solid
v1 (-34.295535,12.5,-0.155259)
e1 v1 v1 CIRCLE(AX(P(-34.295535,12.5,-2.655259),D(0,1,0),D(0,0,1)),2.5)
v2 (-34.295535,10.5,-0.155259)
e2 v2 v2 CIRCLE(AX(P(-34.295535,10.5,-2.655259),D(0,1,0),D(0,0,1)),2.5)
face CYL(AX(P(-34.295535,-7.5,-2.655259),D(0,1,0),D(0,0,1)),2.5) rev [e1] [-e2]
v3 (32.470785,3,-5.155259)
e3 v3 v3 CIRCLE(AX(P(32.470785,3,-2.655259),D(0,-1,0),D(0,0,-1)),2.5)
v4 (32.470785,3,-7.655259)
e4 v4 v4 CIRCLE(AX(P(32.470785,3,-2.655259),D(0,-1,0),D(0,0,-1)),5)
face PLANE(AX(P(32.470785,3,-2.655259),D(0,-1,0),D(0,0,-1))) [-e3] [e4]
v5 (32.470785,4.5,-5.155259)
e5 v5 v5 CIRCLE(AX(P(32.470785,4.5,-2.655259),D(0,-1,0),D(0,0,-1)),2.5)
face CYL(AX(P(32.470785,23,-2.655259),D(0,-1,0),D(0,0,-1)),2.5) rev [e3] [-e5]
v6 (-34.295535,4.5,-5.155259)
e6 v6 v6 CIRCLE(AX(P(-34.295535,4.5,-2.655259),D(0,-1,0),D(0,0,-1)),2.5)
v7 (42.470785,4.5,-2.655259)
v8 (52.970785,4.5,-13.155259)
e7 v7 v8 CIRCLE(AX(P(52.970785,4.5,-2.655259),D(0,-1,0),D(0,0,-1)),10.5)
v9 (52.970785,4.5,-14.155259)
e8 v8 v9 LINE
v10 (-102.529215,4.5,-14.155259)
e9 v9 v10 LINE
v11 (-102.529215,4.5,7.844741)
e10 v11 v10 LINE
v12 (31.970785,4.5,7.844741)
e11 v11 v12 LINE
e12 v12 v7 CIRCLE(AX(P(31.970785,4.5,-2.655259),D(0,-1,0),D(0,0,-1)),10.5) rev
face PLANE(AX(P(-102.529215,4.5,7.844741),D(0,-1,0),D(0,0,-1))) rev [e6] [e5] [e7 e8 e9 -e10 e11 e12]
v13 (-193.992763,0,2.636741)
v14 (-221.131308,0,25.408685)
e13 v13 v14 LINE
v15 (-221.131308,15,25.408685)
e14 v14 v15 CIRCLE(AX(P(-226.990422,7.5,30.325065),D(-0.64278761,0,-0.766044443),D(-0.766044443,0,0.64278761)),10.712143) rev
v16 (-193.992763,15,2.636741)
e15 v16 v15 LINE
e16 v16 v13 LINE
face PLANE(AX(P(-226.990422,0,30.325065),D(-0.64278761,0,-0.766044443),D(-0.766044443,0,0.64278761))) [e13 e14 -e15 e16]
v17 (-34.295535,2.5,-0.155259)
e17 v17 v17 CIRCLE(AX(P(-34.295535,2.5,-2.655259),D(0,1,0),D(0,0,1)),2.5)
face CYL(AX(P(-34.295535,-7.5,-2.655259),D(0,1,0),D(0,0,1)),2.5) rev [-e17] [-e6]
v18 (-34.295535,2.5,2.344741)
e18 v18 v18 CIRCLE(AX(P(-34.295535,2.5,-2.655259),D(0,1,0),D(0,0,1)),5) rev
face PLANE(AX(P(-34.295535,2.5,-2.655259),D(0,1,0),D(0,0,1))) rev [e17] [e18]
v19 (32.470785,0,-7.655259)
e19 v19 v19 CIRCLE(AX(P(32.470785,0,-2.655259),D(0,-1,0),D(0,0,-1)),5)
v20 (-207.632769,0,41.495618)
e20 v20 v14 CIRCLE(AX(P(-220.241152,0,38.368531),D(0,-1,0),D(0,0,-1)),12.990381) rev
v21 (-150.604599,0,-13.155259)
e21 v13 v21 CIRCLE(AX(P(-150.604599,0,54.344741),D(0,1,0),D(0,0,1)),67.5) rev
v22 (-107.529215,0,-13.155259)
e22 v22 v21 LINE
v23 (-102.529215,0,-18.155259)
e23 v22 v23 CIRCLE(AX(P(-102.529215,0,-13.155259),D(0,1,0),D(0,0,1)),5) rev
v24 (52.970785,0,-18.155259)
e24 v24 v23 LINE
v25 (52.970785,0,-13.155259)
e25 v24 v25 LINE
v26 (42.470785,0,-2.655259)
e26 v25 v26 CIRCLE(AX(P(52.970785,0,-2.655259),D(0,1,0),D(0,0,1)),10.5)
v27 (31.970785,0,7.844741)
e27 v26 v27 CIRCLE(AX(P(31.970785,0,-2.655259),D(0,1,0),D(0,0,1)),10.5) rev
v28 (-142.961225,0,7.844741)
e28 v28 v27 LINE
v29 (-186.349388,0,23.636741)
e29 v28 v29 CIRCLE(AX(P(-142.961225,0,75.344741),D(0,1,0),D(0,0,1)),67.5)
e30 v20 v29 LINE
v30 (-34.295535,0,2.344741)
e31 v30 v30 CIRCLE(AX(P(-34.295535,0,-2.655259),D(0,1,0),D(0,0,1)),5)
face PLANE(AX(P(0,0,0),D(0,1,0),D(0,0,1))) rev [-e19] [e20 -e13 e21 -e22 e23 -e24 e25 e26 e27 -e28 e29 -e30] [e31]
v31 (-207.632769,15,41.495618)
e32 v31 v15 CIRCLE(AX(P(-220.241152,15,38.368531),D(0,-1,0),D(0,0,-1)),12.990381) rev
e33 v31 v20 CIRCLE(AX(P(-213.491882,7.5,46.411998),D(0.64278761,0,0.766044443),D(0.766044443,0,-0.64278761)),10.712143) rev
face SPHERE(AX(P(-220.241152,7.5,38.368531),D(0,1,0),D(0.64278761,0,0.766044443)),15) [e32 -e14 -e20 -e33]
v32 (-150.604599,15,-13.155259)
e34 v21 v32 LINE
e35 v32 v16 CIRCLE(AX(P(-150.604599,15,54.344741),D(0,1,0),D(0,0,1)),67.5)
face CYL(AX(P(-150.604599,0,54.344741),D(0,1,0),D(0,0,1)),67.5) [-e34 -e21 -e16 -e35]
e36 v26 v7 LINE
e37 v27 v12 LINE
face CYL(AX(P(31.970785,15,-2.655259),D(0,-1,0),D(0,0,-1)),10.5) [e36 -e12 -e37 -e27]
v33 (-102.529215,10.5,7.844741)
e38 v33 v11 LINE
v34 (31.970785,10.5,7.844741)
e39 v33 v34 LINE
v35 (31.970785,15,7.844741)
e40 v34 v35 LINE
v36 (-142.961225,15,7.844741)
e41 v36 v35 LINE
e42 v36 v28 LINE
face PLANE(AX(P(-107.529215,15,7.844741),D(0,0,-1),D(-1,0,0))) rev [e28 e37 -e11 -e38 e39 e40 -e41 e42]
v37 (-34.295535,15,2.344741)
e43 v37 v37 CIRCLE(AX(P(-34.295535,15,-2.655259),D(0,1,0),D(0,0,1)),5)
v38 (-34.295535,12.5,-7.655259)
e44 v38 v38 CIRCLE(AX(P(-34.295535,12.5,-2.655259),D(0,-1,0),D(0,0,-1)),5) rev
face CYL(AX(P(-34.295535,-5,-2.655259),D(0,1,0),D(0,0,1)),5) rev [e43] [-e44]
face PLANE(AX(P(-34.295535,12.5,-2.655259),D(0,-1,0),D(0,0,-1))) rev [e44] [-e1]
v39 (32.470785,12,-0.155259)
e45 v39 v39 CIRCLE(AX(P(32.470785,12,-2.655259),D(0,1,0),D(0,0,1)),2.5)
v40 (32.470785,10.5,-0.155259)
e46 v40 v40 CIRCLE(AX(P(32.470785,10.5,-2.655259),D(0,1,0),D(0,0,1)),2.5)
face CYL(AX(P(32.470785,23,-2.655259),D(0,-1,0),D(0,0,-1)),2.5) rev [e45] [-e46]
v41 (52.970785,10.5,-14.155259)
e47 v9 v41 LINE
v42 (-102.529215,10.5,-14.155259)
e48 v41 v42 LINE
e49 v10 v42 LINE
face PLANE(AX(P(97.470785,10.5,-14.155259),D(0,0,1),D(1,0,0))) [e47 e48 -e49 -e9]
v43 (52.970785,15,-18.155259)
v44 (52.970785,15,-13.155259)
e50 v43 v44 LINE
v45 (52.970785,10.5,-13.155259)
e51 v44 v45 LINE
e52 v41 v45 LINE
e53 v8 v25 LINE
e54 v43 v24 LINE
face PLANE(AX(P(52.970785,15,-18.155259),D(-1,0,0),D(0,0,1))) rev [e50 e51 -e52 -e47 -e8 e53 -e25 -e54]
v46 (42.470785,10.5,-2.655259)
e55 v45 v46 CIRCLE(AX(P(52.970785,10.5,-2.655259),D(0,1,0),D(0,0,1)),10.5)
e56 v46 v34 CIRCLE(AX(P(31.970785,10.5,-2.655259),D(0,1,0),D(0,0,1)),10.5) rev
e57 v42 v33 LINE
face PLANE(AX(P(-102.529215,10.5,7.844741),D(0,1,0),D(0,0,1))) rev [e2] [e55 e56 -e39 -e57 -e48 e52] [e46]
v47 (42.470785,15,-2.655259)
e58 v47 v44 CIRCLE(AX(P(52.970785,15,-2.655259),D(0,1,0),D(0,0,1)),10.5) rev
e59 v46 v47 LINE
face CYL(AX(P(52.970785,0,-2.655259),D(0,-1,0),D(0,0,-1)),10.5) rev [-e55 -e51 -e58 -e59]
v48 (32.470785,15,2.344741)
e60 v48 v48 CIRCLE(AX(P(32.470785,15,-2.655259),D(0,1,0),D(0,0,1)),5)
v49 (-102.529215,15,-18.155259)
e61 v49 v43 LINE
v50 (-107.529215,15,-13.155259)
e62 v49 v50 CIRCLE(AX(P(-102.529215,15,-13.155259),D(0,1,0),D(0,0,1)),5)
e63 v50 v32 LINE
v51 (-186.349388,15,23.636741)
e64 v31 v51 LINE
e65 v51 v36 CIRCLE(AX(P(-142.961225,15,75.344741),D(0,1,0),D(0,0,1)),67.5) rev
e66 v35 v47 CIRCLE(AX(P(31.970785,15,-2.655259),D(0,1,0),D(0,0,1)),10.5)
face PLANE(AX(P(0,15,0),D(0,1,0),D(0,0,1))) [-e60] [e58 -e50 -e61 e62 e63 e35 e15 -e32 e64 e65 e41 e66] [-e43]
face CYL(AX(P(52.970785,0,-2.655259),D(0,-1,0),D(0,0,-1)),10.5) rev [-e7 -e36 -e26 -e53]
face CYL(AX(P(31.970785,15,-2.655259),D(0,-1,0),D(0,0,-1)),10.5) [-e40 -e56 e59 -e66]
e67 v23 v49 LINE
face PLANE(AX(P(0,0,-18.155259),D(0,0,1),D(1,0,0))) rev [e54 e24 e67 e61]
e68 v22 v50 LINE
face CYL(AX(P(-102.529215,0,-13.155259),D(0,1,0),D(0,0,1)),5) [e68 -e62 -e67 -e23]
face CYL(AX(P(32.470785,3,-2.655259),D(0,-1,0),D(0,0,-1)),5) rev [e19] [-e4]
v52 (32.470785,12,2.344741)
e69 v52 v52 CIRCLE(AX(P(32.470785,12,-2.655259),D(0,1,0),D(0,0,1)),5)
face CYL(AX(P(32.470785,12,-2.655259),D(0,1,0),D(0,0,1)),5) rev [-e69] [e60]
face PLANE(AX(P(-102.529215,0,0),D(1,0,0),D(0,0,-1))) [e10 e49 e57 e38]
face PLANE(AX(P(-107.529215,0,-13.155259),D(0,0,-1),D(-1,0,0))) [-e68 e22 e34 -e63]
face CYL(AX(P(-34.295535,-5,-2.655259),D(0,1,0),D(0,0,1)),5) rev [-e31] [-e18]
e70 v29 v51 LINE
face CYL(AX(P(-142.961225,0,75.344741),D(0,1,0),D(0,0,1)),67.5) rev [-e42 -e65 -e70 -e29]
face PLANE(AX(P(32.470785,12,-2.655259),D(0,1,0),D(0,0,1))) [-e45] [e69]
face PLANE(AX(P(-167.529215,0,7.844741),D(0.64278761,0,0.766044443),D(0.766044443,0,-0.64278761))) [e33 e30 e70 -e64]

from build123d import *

# Parameters (mm, degrees)
SKETCH_1_W          = 150
SKETCH_1_H          = 21.000000000000004
EXTRUDE_1_DEPTH     = 15
CUT_EXTRUDE_1_DEPTH = 145
SKETCH_3_R          = 5.000000000000004
CUT_EXTRUDE_2_DEPTH = 3
CUT_EXTRUDE_START   = -3
SKETCH_4_R          = 5.000000000000001
CUT_EXTRUDE_3_DEPTH = 3
SKETCH_5_R          = 2.4999999999999987
CUT_EXTRUDE_4_DEPTH = 20
SKETCH_6_R          = 5.000000000000001
CUT_EXTRUDE_5_DEPTH = 20
SKETCH_7_R          = 5.999999999999998
EXTRUDE_2_DEPTH     = 2
SKETCH_8_R          = 6.000000000000003
EXTRUDE_3_DEPTH     = 2
SKETCH_9_R          = 2.500000000000002
CUT_EXTRUDE_6_DEPTH = 20
EXTRUDE_5_DEPTH     = 15
EXTRUDE_6_DEPTH     = 5
FILLET_1_R          = 5
FILLET_2_R          = 10.5
FILLET_3_R          = 67.5
SKETCH_17_W         = 22.000000000000004
SKETCH_17_H         = 5.999999999999995
CUT_EXTRUDE_7_DEPTH = 200


with BuildPart() as part:
    # 草图1 → 凸台-拉伸1 (new body)
    with BuildSketch(Plane(origin=(0, 0, 0), x_dir=(1, 0, 0), z_dir=(0, 1, 0))):
        with Locations((-32.52921535893155, 2.6552587646076753)):
            Rectangle(SKETCH_1_W, SKETCH_1_H)
    extrude(amount=EXTRUDE_1_DEPTH)

    # 草图2 → 切除-拉伸1 (cut)
    with BuildSketch(Plane(origin=(42.470784641068455, 0, 0), x_dir=(0, 0, -1), z_dir=(1, 0, 0))):
        Polygon((-7.844741235392326, 10.499999999999998), (13.155258764607675, 10.499999999999998), (13.155258764607675, 4.500000000000001), (-7.844741235392326, 4.5), align=None)
    extrude(amount=-CUT_EXTRUDE_1_DEPTH, mode=Mode.SUBTRACT)

    # 草图3 → 切除-拉伸2 (cut)
    with BuildSketch(Plane(origin=(0, 15, 0), x_dir=(1, 0, 0), z_dir=(0, 1, 0))):
        with Locations(Location((32.47078464106845, 2.655258764607675, 0), (0, 0, 270))):
            Circle(SKETCH_3_R)
    extrude(amount=-CUT_EXTRUDE_2_DEPTH, mode=Mode.SUBTRACT)

    # 草图4 → 切除-拉伸3 (cut)
    with BuildSketch(Plane(origin=(0, 0, 0), x_dir=(-1, 0, 0), z_dir=(0, -1, 0)).offset(CUT_EXTRUDE_START)):
        with Locations(Location((-32.47078464106845, 2.655258764607675, 0), (0, 0, 270))):
            Circle(SKETCH_4_R)
    extrude(amount=CUT_EXTRUDE_3_DEPTH, mode=Mode.SUBTRACT)

    # 草图5 → 切除-拉伸4 (cut)
    with BuildSketch(Plane(origin=(0, 3, 0), x_dir=(-1, 0, 0), z_dir=(0, -1, 0))):
        with Locations(Location((-32.47078464106845, 2.655258764607675, 0), (0, 0, 270))):
            Circle(SKETCH_5_R)
    extrude(amount=-CUT_EXTRUDE_4_DEPTH, mode=Mode.SUBTRACT)

    # 草图6 → 切除-拉伸5 (cut)
    with BuildSketch(Plane(origin=(0, 15, 0), x_dir=(1, 0, 0), z_dir=(0, 1, 0))):
        with Locations(Location((-34.295534758931545, 2.655258764607675, 0), (0, 0, 270))):
            Circle(SKETCH_6_R)
    extrude(amount=-CUT_EXTRUDE_5_DEPTH, mode=Mode.SUBTRACT)

    # 草图7 → 凸台-拉伸2 (add)
    with BuildSketch(Plane(origin=(0, 4.5, 1.9e-16), x_dir=(1, 0, 0), z_dir=(0, 1, 4e-17))):
        with Locations((-34.295534758931545, 2.655258764607675)):
            Circle(SKETCH_7_R)
    extrude(amount=-EXTRUDE_2_DEPTH)

    # 草图8 → 凸台-拉伸3 (add)
    with BuildSketch(Plane(origin=(0, 10.499999999999998, 0), x_dir=(-1, 0, 0), z_dir=(0, -1, 0))):
        with Locations((34.295534758931545, 2.655258764607675)):
            Circle(SKETCH_8_R)
    extrude(amount=-EXTRUDE_3_DEPTH)

    # 草图9 → 切除-拉伸6 (cut)
    with BuildSketch(Plane(origin=(0, 12.499999999999998, 0), x_dir=(1, 0, 0), z_dir=(0, 1, 0))):
        with Locations(Location((-34.295534758931545, 2.655258764607675, 0), (0, 0, 270))):
            Circle(SKETCH_9_R)
    extrude(amount=-CUT_EXTRUDE_6_DEPTH, mode=Mode.SUBTRACT)



with BuildPart() as body_2:
    # 草图12 → 凸台-拉伸5 (new body)
    with BuildSketch(Plane(origin=(0, 15, 0), x_dir=(1, 0, 0), z_dir=(0, 1, 0))):
        Polygon((-107.52921535893154, -7.844741235392326), (-167.52921535893154, -7.844741235392335), (-213.49188194607015, -46.41199781658475), (-226.9904217494875, -30.32506451108624), (-175.17259027852143, 13.155258764607666), (-107.52921535893154, 13.155258764607675), align=None)
    extrude(amount=-EXTRUDE_5_DEPTH)

    # 草图13 → 旋转3 (revolve)
    with BuildSketch(Plane(origin=(-148.13562673762334, 0, 124.30054975975524), x_dir=(0.6427876096865401, 0, 0.7660444431189775), z_dir=(-0.7660444431189775, 0, 0.6427876096865401))):
        with BuildLine():
            Line((-112.17628346215061, 22.5), (-112.17628346215061, -7.5))
            ThreePointArc((-112.17628346215061, -7.5), (-97.17628346215061, 7.5), (-112.17628346215061, 22.5))
        make_face()
    revolve(axis=Axis((-220.2411518477789, 22.5, 38.36853116383551), (0, -1, 0)))


with BuildPart() as part_1:
    add(part.part)

    add(body_2.part)  # 凸台-拉伸6 merges body 2
    # 草图14 → 凸台-拉伸6 (add)
    with BuildSketch(Plane(origin=(0, 0, -13.155258764607675), x_dir=(-1, 0, 0), z_dir=(0, 0, -1))):
        Polygon((107.52921535893154, 15), (-52.97078464106847, 14.99999999999998), (-52.97078464106847, -3.99e-14), (107.52921535893154, 0), align=None)
    extrude(amount=EXTRUDE_6_DEPTH)

    # 圆角1
    fillet_1_edges = [part_1.edges().sort_by_distance(p)[0] for p in [
        (-107.52921535893154, 7.5, -18.155258764607673),
    ]]
    fillet(fillet_1_edges, radius=FILLET_1_R - 0.0001)  # a hair under: the kernel refuses the full size

    # 圆角2
    fillet_2_edges = [part_1.edges().sort_by_distance(p)[0] for p in [
        (42.470784641068455, 12.75, -13.155258764607675),
    ]]
    fillet(fillet_2_edges, radius=FILLET_2_R - 0.0001)  # a hair under: the kernel refuses the full size
    fillet_2_2_edges = [part_1.edges().sort_by_distance(p)[0] for p in [
        (42.470784641068455, 2.2500000000000004, -13.155258764607675),
    ]]
    fillet(fillet_2_2_edges, radius=FILLET_2_R - 0.0001)  # a hair under: the kernel refuses the full size
    fillet_2_3_edges = [part_1.edges().sort_by_distance(p)[0] for p in [
        (42.470784641068455, 2.25, 7.844741235392326),
    ]]
    fillet(fillet_2_3_edges, radius=FILLET_2_R)
    fillet_2_4_edges = [part_1.edges().sort_by_distance(p)[0] for p in [
        (42.470784641068455, 12.75, 7.844741235392326),
    ]]
    fillet(fillet_2_4_edges, radius=FILLET_2_R)

    # 圆角3
    fillet_3_edges = [part_1.edges().sort_by_distance(p)[0] for p in [
        (-167.52921535893154, 7.5, 7.844741235392335),
        (-175.17259027852143, 7.5, -13.155258764607666),
    ]]
    fillet(fillet_3_edges, radius=FILLET_3_R)

    # 草图17 → 切除-拉伸7 (cut)
    with BuildSketch(Plane(origin=(-102.52921535893152, 0, 0), x_dir=(0, 0, -1), z_dir=(1, 0, 0))):
        with Locations((3.1552587646076753, 7.500000000000001)):
            Rectangle(SKETCH_17_W, SKETCH_17_H)
    extrude(amount=CUT_EXTRUDE_7_DEPTH, mode=Mode.SUBTRACT)


solid = part_1.part
